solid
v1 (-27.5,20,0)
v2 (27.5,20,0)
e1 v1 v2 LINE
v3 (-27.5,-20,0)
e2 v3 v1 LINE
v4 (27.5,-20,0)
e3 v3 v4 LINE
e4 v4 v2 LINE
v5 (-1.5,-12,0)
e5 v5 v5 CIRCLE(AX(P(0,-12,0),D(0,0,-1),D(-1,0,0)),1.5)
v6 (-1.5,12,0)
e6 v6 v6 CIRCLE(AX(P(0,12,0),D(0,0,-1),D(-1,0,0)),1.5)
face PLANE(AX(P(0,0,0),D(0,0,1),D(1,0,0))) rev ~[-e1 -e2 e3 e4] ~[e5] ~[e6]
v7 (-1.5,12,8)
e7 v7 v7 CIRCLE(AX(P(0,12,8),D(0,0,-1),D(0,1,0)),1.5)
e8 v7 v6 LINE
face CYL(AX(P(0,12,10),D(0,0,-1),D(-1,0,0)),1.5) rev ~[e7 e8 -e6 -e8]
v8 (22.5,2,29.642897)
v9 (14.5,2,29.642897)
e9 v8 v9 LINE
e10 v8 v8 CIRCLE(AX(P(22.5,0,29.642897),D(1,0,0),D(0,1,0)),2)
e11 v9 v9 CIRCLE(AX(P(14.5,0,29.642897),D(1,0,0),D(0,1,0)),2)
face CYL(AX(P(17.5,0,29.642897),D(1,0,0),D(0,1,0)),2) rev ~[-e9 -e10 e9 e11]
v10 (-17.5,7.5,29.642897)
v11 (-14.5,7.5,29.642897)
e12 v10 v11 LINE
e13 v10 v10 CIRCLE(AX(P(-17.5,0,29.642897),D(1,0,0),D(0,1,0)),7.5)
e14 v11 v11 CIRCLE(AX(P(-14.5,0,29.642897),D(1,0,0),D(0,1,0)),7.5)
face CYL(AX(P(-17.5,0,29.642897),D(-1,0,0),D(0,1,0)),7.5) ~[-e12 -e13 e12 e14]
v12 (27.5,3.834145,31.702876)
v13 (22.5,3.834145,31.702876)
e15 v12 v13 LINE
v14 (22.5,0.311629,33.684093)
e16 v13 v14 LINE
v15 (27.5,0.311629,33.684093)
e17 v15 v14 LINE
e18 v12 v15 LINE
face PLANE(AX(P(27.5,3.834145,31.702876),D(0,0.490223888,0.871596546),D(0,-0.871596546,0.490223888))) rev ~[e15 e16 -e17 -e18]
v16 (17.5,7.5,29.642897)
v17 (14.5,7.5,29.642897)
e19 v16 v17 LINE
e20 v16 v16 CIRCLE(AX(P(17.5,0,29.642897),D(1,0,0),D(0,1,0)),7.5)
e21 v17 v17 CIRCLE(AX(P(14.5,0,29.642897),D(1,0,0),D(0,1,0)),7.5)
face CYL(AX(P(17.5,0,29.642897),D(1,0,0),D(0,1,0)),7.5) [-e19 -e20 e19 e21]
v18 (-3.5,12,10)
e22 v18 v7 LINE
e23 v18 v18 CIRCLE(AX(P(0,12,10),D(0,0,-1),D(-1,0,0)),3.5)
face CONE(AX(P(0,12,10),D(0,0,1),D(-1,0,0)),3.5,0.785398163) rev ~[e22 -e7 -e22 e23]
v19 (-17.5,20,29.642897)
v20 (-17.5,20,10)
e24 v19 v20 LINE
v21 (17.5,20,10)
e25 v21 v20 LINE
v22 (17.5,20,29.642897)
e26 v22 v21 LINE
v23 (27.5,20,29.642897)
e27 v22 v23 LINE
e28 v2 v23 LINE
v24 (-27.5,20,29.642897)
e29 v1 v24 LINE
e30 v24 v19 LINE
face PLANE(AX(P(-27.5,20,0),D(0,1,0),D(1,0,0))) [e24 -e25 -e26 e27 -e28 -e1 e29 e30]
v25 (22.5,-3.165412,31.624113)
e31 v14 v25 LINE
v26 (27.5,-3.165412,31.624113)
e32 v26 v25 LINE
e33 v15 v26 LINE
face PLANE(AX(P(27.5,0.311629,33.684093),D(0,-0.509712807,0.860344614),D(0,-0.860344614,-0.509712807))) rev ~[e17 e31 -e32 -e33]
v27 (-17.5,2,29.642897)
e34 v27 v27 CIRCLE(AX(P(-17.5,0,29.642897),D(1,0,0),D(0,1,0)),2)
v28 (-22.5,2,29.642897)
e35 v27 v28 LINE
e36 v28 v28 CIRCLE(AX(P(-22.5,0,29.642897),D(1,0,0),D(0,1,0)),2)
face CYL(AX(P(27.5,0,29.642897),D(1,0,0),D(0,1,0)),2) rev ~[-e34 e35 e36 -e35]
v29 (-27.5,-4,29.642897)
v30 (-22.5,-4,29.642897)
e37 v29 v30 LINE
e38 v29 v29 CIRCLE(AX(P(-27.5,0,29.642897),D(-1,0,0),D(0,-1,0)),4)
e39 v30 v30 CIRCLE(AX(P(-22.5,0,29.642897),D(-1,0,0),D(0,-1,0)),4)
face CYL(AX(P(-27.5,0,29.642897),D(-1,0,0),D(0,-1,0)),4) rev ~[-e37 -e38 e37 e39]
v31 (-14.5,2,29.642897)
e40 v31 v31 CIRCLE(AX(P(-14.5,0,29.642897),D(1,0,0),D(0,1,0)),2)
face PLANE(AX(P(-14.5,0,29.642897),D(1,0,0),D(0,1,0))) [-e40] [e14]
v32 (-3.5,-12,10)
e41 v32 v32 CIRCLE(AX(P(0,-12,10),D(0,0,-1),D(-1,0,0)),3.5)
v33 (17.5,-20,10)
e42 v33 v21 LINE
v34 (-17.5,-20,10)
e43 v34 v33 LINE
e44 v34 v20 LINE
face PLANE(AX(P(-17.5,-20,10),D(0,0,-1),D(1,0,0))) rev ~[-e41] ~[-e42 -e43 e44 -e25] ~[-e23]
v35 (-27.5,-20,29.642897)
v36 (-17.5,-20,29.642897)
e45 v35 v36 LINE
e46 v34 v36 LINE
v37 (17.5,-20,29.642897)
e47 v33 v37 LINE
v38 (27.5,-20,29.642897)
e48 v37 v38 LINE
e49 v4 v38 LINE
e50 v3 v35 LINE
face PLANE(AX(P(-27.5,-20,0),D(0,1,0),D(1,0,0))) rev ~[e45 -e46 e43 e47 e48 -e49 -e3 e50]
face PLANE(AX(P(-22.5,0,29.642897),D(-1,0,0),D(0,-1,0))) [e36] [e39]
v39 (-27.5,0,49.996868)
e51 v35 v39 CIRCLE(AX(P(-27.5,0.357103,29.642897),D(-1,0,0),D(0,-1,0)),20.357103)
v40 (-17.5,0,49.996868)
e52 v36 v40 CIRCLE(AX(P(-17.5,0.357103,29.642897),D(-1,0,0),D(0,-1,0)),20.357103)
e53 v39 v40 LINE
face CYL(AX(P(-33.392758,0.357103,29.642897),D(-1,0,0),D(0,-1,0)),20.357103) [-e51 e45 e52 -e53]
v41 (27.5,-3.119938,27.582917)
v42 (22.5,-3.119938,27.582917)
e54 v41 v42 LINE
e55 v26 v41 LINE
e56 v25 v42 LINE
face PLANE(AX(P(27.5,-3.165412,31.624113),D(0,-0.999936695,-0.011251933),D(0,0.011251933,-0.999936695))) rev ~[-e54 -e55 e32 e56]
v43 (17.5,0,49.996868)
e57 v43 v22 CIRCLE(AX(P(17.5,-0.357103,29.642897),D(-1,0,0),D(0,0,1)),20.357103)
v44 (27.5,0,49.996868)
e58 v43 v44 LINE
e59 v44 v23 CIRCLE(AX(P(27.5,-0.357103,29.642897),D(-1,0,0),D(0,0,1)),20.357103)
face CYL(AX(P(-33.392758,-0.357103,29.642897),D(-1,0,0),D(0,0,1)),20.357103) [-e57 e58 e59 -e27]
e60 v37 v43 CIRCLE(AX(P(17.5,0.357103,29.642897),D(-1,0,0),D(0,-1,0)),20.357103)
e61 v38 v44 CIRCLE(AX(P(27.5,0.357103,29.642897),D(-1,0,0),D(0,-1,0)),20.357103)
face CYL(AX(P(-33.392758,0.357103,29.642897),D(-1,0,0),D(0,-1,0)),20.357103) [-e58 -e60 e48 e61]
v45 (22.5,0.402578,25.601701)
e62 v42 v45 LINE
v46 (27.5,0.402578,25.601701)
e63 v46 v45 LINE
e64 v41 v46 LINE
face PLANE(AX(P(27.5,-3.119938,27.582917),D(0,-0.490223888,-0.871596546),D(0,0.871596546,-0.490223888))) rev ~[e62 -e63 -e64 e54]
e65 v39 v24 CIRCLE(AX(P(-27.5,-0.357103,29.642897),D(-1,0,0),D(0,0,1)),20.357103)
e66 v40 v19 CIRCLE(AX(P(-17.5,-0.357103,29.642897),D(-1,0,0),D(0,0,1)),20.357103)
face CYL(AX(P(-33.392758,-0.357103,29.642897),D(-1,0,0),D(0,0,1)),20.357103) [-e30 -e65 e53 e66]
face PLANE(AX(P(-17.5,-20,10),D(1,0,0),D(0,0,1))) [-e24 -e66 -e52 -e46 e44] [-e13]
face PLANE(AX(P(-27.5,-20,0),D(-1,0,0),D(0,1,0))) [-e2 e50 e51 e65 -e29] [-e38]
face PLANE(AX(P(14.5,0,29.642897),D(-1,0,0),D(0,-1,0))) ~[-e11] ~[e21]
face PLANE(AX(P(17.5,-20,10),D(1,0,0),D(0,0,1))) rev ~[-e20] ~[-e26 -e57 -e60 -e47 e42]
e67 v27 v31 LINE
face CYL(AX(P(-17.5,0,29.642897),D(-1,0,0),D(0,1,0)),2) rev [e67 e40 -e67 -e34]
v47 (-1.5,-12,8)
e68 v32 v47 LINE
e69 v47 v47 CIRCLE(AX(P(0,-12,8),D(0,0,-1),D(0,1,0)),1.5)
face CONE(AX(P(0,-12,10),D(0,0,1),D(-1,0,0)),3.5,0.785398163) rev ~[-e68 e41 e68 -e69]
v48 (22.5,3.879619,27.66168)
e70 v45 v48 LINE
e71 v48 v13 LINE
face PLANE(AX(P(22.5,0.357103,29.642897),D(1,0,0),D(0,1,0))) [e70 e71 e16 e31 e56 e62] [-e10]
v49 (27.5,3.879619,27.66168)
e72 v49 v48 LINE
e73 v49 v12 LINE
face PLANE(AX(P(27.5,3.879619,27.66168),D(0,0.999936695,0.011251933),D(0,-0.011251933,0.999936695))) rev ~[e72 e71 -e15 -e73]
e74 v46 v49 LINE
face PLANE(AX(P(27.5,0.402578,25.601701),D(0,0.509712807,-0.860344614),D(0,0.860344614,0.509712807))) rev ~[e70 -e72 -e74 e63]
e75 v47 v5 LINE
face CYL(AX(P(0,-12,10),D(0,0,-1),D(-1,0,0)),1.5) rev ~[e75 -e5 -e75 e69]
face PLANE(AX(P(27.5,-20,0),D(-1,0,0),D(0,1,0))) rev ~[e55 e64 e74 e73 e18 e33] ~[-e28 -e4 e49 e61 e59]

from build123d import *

# Parameters (mm, degrees)
F0_W           = 55
F0_H           = 40
F12_DEPTH      = 50
F1_W           = 35
F1_H           = 40
F13_DEPTH      = 40.001
F14_T1_DEPTH   = 111.7855168217
F14_T3_DEPTH   = 111.7855168217
F15_R          = 2
F2_DEPTH       = 55.001
F3_R           = 7.5
F3_R_2         = 2
F16_DEPTH      = 3
F6_D           = 3
F6_CSINK_D     = 7
F6_CSINK_ANGLE = 90
F7_R           = 2
F8_DEPTH       = 5
F17_R          = 4
F17_R_2        = 2
F9_DEPTH       = 5


# Not quite as in the source:
# - a fillet or chamfer that OpenCascade refuses, or shapes differently, is made with other operations: its cross-section is extruded or revolved along the edge and cut away or added


with BuildPart() as f12:
    # F0 (on Top) → F12 (new body)
    with BuildSketch(Plane.XY):
        Rectangle(F0_W, F0_H)
    extrude(amount=F12_DEPTH)

    # F1 (on face) → F13 (cut, through all)
    with BuildSketch(Plane.XZ.offset(20)):
        with Locations((0, 30)):
            Rectangle(F1_W, F1_H)
    extrude(amount=-F13_DEPTH, mode=Mode.SUBTRACT)

    # F14: fillet of radius 20.3571033643 on 4 edges, made by hand

    # F14_s2 → F14_t1 (cut)
    with BuildSketch(Plane.YZ.offset(-33.3927584109)):
        with BuildLine():
            ThreePointArc((-20, 29.6428966357), (-14.0375424699, 44.0375424699), (0.3571033643, 50))
            Line((0.3571033643, 50), (-20, 50))
            Line((-20, 50), (-20, 29.6428966357))
        make_face()
        with BuildLine():
            ThreePointArc((-0.3571033643, 50), (14.0375424699, 44.0375424699), (20, 29.6428966357))
            Line((20, 29.6428966357), (20, 50))
            Line((20, 50), (-0.3571033643, 50))
        make_face()
    extrude(amount=F14_T1_DEPTH, mode=Mode.SUBTRACT)

    # F14_s4 → F14_t3 (cut)
    with BuildSketch(Plane.YZ.offset(-78.3927584109)):
        with BuildLine():
            ThreePointArc((-20, 29.6428966357), (-14.0375424699, 44.0375424699), (0.3571033643, 50))
            Line((0.3571033643, 50), (-20, 50))
            Line((-20, 50), (-20, 29.6428966357))
        make_face()
        with BuildLine():
            ThreePointArc((-0.3571033643, 50), (14.0375424699, 44.0375424699), (20, 29.6428966357))
            Line((20, 29.6428966357), (20, 50))
            Line((20, 50), (-0.3571033643, 50))
        make_face()
    extrude(amount=F14_T3_DEPTH, mode=Mode.SUBTRACT)

    # F15 (on face) → F2 (cut, through all)
    with BuildSketch(Plane.YZ.offset(27.5)):
        with Locations((0, 29.6428966357)):
            Circle(F15_R)
    extrude(amount=-F2_DEPTH, mode=Mode.SUBTRACT)

    # F3 (on face) → F16 (join)
    with BuildSketch(Plane.YZ.offset(-17.5)):
        with Locations((0, 29.6428966357)):
            Circle(F3_R)
        with Locations((0, 29.6428966357)):
            Circle(F3_R_2, mode=Mode.SUBTRACT)
    extrude(amount=F16_DEPTH)

    # F4: F12 across plane


with BuildPart() as f12_1:
    add(f12.part)
    add(f12.part.mirror(Plane.YZ))

    # F6 (through all)
    with Locations(Plane.XY.offset(10)):
        with Locations((0, 12), (0, -12)):
            CounterSinkHole(F6_D / 2, F6_CSINK_D / 2, counter_sink_angle=F6_CSINK_ANGLE)

    # F7 (on face) → F8 (cut)
    with BuildSketch(Plane.YZ.offset(27.5)):
        Polygon((0.4025775089, 25.6017005954), (3.8796188691, 27.6616803799), (3.8341447246, 31.7028764202), (0.3116292198, 33.6840926759), (-3.1654121404, 31.6241128914), (-3.1199379959, 27.5829168512), align=None)
        with Locations((0, 29.6428966357)):
            Circle(F7_R, mode=Mode.SUBTRACT)
    extrude(amount=-F8_DEPTH, mode=Mode.SUBTRACT)

    # F17 (on face) → F9 (cut)
    with BuildSketch(Plane(origin=(-27.5, 0, 0), x_dir=(0, -1, 0), z_dir=(-1, 0, 0))):
        with Locations((0, 29.6428966357)):
            Circle(F17_R)
        with Locations((0, 29.6428966357)):
            Circle(F17_R_2, mode=Mode.SUBTRACT)
    extrude(amount=-F9_DEPTH, mode=Mode.SUBTRACT)


solid = f12_1.part
